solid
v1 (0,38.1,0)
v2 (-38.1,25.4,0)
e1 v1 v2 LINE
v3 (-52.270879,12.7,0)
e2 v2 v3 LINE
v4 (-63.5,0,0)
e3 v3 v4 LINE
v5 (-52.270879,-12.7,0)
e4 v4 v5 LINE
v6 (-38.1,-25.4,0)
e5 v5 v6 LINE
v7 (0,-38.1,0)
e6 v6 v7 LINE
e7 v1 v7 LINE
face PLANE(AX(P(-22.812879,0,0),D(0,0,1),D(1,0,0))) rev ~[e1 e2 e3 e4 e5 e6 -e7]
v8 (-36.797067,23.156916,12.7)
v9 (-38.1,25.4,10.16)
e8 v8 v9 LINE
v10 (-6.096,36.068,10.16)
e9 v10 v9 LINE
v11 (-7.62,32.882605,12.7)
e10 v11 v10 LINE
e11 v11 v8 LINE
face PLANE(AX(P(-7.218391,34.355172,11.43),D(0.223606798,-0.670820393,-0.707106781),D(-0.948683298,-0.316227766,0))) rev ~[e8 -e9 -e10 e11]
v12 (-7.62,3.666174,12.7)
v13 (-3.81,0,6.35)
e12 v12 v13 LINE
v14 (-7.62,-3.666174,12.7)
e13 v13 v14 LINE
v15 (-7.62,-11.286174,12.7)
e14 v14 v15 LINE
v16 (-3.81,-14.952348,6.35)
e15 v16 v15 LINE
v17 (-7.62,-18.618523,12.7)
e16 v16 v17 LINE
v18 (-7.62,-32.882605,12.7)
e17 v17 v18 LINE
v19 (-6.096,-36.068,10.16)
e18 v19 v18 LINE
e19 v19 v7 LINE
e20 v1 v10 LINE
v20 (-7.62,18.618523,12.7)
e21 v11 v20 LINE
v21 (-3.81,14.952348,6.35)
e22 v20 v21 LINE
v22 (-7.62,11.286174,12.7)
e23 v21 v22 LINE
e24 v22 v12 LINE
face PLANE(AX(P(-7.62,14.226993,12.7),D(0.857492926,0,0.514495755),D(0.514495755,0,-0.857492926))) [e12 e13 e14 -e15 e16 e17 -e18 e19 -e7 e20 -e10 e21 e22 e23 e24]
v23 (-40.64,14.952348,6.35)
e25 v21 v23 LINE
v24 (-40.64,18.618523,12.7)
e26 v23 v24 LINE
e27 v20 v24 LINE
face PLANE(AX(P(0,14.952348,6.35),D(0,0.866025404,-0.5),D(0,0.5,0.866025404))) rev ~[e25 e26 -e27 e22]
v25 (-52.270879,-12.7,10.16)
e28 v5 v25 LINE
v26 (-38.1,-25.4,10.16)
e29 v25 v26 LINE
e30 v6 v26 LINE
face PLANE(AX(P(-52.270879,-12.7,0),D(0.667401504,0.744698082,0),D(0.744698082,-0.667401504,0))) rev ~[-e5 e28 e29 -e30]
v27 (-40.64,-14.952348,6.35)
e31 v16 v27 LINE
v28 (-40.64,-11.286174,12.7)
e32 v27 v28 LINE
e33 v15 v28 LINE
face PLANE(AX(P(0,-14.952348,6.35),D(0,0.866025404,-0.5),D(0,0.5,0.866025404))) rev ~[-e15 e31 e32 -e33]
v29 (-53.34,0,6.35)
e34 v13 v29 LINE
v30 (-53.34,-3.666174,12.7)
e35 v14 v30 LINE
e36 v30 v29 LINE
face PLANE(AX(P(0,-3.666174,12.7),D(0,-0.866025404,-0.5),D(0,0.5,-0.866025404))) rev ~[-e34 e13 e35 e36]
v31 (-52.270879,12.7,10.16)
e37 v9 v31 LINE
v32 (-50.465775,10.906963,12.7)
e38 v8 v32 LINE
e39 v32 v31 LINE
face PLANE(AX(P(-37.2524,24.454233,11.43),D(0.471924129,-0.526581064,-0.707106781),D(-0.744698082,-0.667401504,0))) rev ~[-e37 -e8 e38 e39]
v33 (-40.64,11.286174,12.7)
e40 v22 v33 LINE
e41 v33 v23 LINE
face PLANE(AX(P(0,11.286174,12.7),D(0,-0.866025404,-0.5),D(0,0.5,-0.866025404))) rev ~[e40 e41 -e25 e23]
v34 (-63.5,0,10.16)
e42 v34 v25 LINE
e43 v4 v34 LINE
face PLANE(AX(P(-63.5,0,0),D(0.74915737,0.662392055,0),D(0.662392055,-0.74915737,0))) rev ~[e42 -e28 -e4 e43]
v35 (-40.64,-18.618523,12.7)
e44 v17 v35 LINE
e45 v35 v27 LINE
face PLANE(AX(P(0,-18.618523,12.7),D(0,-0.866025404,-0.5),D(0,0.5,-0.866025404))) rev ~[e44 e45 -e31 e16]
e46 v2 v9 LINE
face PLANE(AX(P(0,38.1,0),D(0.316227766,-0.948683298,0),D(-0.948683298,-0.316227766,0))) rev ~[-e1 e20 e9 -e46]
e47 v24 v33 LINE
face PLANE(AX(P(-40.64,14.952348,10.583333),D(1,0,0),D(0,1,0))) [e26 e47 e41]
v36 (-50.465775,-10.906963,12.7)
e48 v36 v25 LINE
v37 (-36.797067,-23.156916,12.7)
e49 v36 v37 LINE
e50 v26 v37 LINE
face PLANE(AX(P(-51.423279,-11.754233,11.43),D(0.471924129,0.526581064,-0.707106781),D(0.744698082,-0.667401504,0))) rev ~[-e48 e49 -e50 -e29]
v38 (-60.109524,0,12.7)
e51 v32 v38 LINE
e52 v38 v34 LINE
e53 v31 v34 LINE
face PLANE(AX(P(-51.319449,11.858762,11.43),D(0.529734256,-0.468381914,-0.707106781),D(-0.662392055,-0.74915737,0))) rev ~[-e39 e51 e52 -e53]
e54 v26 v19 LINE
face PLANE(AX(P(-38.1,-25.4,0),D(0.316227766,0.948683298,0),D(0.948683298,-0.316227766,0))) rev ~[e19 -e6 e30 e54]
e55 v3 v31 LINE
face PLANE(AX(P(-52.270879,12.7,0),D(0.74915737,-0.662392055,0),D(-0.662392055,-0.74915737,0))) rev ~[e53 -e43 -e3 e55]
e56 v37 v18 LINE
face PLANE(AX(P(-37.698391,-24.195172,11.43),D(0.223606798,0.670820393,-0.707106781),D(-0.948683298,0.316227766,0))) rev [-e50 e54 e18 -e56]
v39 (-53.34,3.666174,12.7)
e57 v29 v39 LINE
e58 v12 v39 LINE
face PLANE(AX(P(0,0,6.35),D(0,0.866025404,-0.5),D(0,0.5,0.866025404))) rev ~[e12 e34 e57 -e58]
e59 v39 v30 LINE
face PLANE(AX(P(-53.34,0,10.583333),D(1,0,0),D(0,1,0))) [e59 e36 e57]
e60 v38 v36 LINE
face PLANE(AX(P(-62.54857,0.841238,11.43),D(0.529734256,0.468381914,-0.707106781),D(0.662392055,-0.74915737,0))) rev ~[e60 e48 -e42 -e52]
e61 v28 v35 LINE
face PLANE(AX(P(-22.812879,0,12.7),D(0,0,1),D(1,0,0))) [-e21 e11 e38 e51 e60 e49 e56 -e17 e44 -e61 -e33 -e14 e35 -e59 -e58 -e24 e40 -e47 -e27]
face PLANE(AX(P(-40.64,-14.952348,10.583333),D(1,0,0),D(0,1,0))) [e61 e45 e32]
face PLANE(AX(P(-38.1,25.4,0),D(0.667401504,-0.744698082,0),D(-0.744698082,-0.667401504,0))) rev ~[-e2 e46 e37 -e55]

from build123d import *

# Parameters (mm, degrees)
F1_DEPTH    = 12.7
F3_DEPTH    = 40.64
F4_DEPTH    = 53.34
F5_T1_DEPTH = 85.1725092407
F5_T3_DEPTH = 73.3110318687
F5_T5_DEPTH = 73.3110318687
F5_T7_DEPTH = 85.1725092407
F6_SIZE     = 2.54


# Not quite as in the source:
# - a fillet or chamfer that OpenCascade refuses, or shapes differently, is made with other operations: its cross-section is extruded or revolved along the edge and cut away or added


with BuildPart() as f1:
    # F0 (on Top) → F1 (new body)
    with BuildSketch(Plane.XY):
        Polygon((0, -38.1), (0, 38.1), (-38.1, 25.4), (-52.2708785332, 12.7), (-63.5, 0), (-52.2708785332, -12.7), (-38.1, -25.4), align=None)
    extrude(amount=F1_DEPTH)

    # F2 (on face) → F3 (cut)
    with BuildSketch(Plane.YZ):
        Polygon((-14.9523484187, 6.35), (-11.2861742094, 12.7), (-18.6185226281, 12.7), align=None)
        Polygon((18.6185226281, 12.7), (11.2861742094, 12.7), (14.9523484187, 6.35), align=None)
    extrude(amount=-F3_DEPTH, mode=Mode.SUBTRACT)

    # F2 (on face) → F4 (cut)
    with BuildSketch(Plane.YZ):
        Polygon((3.6661742094, 12.7), (-3.6661742094, 12.7), (0, 6.35), align=None)
    extrude(amount=-F4_DEPTH, mode=Mode.SUBTRACT)

    # F5: chamfer of 7.62 x 12.7 on 4 edges, made by hand

    # F5_s2 → F5_t1 (cut)
    with BuildSketch(Plane.XZ.offset(-14.2269933063)):
        Polygon((-7.62, 12.7), (0, 0), (0, 12.7), align=None)
    extrude(amount=F5_T1_DEPTH, mode=Mode.SUBTRACT)

    # F5_s4 → F5_t3 (cut)
    with BuildSketch(Plane.XZ.offset(-29.179341725)):
        Polygon((-7.62, 12.7), (0, 0), (0, 12.7), align=None)
    extrude(amount=F5_T3_DEPTH, mode=Mode.SUBTRACT)

    # F5_s6 → F5_t5 (cut)
    with BuildSketch(Plane.XZ.offset(-44.1316901437)):
        Polygon((-7.62, 12.7), (0, 0), (0, 12.7), align=None)
    extrude(amount=F5_T5_DEPTH, mode=Mode.SUBTRACT)

    # F5_s8 → F5_t7 (cut)
    with BuildSketch(Plane.XZ.offset(-70.9455159344)):
        Polygon((-7.62, 12.7), (0, 0), (0, 12.7), align=None)
    extrude(amount=F5_T7_DEPTH, mode=Mode.SUBTRACT)

    # F6
    f6_edges = [f1.edges().sort_by_distance(p)[0] for p in [
        (-22.86, -30.48, 12.7),
        (-45.185439, -19.05, 12.7),
        (-57.885439, -6.35, 12.7),
        (-57.885439, 6.35, 12.7),
        (-45.185439, 19.05, 12.7),
        (-22.86, 30.48, 12.7),
    ]]
    chamfer(f6_edges, length=F6_SIZE)


solid = f1.part
